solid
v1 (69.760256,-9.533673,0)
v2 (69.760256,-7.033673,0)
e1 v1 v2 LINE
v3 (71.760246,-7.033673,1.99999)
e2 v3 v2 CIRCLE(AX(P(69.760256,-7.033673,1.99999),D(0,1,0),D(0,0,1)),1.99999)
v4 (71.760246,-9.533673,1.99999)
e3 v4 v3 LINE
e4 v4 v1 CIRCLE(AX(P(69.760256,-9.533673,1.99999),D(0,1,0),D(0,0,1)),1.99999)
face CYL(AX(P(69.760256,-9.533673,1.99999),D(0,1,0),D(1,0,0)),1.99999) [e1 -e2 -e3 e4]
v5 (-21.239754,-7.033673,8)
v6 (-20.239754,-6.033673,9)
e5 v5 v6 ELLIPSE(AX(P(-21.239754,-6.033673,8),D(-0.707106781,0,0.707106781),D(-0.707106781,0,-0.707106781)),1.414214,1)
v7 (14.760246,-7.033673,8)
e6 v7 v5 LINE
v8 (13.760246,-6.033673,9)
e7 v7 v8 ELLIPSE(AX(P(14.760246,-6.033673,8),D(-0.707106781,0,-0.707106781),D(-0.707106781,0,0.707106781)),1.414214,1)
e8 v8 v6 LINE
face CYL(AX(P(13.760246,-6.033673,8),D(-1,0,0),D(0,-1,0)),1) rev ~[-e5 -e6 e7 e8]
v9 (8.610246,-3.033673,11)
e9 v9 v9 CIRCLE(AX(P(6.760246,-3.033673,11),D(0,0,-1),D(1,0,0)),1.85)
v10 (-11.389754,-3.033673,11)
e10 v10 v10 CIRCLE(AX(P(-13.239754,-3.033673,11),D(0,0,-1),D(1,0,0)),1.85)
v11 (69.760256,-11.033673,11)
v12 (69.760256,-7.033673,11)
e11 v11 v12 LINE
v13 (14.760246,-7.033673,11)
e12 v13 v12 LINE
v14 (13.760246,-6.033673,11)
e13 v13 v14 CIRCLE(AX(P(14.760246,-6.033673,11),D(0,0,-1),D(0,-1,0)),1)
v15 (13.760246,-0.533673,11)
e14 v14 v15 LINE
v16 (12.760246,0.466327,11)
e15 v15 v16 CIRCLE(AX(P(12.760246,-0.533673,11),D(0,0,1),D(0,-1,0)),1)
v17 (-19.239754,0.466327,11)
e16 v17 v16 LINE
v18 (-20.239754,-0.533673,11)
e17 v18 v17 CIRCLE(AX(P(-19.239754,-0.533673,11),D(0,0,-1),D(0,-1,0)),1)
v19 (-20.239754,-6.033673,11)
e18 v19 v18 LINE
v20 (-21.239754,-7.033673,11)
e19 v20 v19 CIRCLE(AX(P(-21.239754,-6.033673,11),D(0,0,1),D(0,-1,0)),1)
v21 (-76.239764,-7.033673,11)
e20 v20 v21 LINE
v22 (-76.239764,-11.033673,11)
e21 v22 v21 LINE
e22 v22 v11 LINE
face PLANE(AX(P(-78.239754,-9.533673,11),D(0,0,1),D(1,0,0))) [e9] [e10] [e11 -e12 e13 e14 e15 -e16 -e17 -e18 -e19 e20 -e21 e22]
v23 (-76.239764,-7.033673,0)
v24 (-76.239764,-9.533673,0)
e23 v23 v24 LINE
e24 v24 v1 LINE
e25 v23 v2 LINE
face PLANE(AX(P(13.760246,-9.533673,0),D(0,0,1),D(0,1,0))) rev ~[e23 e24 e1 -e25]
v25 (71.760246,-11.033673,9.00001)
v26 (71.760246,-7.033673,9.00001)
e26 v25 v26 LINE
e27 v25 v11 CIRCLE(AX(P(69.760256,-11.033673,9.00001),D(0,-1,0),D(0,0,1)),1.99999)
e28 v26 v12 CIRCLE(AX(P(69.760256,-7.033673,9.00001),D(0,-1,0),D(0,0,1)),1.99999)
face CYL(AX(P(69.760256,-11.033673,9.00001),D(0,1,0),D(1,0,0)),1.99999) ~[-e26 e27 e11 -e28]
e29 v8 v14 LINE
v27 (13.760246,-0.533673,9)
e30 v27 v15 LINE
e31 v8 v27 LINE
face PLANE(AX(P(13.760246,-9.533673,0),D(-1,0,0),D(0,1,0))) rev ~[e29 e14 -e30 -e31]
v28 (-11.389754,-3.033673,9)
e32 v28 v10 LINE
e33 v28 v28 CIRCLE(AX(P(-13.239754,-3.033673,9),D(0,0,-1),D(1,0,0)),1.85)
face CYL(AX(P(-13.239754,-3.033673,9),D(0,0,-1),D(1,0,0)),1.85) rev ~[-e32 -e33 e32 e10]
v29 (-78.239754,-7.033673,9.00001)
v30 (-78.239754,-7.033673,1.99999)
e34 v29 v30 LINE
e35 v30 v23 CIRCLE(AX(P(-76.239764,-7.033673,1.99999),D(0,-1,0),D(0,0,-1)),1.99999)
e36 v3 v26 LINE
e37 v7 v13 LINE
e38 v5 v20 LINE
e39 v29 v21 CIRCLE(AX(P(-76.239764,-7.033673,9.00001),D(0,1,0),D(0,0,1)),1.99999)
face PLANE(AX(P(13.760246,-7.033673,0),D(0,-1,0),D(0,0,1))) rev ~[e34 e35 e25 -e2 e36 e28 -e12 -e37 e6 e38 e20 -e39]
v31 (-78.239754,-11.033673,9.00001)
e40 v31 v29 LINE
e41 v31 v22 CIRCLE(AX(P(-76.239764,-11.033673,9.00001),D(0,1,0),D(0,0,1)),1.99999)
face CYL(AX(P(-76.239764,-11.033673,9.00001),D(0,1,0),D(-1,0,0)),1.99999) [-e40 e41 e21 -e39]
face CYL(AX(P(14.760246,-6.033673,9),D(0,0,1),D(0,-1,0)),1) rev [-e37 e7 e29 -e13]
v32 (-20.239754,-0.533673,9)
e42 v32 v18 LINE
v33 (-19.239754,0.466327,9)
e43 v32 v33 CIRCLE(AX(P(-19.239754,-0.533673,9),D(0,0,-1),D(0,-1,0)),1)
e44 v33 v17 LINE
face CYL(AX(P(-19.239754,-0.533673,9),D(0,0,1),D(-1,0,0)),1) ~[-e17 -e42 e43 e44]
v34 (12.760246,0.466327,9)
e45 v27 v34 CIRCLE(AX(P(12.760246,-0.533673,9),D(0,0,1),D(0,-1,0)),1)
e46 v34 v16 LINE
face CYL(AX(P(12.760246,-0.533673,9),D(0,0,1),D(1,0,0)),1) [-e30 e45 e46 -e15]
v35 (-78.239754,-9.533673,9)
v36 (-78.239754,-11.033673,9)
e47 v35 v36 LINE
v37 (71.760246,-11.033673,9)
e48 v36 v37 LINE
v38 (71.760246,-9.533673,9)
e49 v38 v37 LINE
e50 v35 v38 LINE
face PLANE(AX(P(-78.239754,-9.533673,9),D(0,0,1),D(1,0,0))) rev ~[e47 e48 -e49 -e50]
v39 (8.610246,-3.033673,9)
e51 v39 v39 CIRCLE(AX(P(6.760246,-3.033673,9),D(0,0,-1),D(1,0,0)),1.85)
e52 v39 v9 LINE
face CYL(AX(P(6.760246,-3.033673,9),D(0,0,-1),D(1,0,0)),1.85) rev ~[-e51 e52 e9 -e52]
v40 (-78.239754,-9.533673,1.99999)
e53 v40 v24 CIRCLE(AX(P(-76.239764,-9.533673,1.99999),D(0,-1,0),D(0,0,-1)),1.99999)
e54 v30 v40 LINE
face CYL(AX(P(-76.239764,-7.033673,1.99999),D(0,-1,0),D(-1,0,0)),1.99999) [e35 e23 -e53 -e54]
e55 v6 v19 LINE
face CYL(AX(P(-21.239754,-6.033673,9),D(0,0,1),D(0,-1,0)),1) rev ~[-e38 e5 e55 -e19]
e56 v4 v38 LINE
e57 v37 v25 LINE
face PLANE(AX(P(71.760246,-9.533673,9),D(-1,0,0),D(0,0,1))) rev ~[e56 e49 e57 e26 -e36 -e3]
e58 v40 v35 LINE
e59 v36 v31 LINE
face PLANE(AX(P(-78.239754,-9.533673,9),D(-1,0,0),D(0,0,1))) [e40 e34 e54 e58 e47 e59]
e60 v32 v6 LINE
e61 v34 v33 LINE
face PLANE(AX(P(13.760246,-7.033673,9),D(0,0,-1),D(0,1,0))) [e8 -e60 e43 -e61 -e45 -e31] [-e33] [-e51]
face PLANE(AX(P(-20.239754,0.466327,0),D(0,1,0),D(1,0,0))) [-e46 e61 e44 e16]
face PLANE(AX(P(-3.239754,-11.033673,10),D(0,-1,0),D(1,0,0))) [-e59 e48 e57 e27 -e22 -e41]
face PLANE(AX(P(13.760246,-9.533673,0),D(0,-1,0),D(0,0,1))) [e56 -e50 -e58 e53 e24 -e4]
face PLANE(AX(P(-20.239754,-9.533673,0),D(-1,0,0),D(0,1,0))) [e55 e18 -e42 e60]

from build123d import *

# Parameters (mm, degrees)
F0_W      = 34
F0_H      = 10
F1_DEPTH  = 11
F2_W      = 2.5
F2_H      = 11
F3_DEPTH  = 58
F4_W      = 2.5
F4_H      = 11
F5_DEPTH  = 58
F6_W      = 7.5
F6_H      = 9
F7_DEPTH  = 92.001
F8_R      = 1.85
F9_DEPTH  = 2.001
F10_R     = 1
F11_W     = 150
F11_H     = 2
F12_DEPTH = 1.5
F13_R     = 1.99999


# Not quite as in the source:
# - a fillet or chamfer is up to 0.001 mm smaller than in the source, because OpenCascade refuses the exact size


with BuildPart() as f1:
    # F0 (on Top) → F1 (new body)
    with BuildSketch(Plane.XY):
        with Locations((-3.2397536635, -4.5336725935)):
            Rectangle(F0_W, F0_H)
    extrude(amount=F1_DEPTH)

    # F2 (on face) → F3 (join)
    with BuildSketch(Plane(origin=(-20.2397536635, 0, 0), x_dir=(0, -1, 0), z_dir=(-1, 0, 0))):
        with Locations((8.2836725935, 5.5)):
            Rectangle(F2_W, F2_H)
    extrude(amount=F3_DEPTH)

    # F4 (on face) → F5 (join)
    with BuildSketch(Plane.YZ.offset(13.7602463365)):
        with Locations((-8.2836725935, 5.5)):
            Rectangle(F4_W, F4_H)
    extrude(amount=F5_DEPTH)

    # F6 (on face) → F7 (cut, through all)
    with BuildSketch(Plane.YZ.offset(13.7602463365)):
        with Locations((-3.2836725935, 4.5)):
            Rectangle(F6_W, F6_H)
    extrude(amount=-F7_DEPTH, mode=Mode.SUBTRACT)

    # F8 (on face) → F9 (cut, through all)
    with BuildSketch(Plane(origin=(0, 0, 9), x_dir=(1, 0, 0), z_dir=(0, 0, -1))):
        with Locations((-13.2397536635, 3.0336725935)):
            Circle(F8_R)
        with Locations((6.7602463365, 3.0336725935)):
            Circle(F8_R)
    extrude(amount=-F9_DEPTH, mode=Mode.SUBTRACT)

    # F10
    f10_edges = [f1.edges().sort_by_distance(p)[0] for p in [
        (-3.239754, -7.033673, 9),
        (-20.239754, -7.033673, 10),
        (13.760246, -7.033673, 10),
        (-20.239754, 0.466327, 10),
        (13.760246, 0.466327, 10),
    ]]
    fillet(f10_edges, radius=F10_R)

    # F11 (on face) → F12 (join)
    with BuildSketch(Plane.XZ.offset(9.5336725935)):
        with Locations((-3.2397536635, 10)):
            Rectangle(F11_W, F11_H)
    extrude(amount=F12_DEPTH)

    # F13 (radius 2 in the source; OpenCascade refuses exactly that, so slightly less here)
    f13_edges = [f1.edges().sort_by_distance(p)[0] for p in [
        (-78.239754, -9.033673, 11),
        (-78.239754, -8.283673, 0),
        (71.760246, -9.033673, 11),
        (71.760246, -8.283673, 0),
    ]]
    fillet(f13_edges, radius=F13_R)


solid = f1.part
